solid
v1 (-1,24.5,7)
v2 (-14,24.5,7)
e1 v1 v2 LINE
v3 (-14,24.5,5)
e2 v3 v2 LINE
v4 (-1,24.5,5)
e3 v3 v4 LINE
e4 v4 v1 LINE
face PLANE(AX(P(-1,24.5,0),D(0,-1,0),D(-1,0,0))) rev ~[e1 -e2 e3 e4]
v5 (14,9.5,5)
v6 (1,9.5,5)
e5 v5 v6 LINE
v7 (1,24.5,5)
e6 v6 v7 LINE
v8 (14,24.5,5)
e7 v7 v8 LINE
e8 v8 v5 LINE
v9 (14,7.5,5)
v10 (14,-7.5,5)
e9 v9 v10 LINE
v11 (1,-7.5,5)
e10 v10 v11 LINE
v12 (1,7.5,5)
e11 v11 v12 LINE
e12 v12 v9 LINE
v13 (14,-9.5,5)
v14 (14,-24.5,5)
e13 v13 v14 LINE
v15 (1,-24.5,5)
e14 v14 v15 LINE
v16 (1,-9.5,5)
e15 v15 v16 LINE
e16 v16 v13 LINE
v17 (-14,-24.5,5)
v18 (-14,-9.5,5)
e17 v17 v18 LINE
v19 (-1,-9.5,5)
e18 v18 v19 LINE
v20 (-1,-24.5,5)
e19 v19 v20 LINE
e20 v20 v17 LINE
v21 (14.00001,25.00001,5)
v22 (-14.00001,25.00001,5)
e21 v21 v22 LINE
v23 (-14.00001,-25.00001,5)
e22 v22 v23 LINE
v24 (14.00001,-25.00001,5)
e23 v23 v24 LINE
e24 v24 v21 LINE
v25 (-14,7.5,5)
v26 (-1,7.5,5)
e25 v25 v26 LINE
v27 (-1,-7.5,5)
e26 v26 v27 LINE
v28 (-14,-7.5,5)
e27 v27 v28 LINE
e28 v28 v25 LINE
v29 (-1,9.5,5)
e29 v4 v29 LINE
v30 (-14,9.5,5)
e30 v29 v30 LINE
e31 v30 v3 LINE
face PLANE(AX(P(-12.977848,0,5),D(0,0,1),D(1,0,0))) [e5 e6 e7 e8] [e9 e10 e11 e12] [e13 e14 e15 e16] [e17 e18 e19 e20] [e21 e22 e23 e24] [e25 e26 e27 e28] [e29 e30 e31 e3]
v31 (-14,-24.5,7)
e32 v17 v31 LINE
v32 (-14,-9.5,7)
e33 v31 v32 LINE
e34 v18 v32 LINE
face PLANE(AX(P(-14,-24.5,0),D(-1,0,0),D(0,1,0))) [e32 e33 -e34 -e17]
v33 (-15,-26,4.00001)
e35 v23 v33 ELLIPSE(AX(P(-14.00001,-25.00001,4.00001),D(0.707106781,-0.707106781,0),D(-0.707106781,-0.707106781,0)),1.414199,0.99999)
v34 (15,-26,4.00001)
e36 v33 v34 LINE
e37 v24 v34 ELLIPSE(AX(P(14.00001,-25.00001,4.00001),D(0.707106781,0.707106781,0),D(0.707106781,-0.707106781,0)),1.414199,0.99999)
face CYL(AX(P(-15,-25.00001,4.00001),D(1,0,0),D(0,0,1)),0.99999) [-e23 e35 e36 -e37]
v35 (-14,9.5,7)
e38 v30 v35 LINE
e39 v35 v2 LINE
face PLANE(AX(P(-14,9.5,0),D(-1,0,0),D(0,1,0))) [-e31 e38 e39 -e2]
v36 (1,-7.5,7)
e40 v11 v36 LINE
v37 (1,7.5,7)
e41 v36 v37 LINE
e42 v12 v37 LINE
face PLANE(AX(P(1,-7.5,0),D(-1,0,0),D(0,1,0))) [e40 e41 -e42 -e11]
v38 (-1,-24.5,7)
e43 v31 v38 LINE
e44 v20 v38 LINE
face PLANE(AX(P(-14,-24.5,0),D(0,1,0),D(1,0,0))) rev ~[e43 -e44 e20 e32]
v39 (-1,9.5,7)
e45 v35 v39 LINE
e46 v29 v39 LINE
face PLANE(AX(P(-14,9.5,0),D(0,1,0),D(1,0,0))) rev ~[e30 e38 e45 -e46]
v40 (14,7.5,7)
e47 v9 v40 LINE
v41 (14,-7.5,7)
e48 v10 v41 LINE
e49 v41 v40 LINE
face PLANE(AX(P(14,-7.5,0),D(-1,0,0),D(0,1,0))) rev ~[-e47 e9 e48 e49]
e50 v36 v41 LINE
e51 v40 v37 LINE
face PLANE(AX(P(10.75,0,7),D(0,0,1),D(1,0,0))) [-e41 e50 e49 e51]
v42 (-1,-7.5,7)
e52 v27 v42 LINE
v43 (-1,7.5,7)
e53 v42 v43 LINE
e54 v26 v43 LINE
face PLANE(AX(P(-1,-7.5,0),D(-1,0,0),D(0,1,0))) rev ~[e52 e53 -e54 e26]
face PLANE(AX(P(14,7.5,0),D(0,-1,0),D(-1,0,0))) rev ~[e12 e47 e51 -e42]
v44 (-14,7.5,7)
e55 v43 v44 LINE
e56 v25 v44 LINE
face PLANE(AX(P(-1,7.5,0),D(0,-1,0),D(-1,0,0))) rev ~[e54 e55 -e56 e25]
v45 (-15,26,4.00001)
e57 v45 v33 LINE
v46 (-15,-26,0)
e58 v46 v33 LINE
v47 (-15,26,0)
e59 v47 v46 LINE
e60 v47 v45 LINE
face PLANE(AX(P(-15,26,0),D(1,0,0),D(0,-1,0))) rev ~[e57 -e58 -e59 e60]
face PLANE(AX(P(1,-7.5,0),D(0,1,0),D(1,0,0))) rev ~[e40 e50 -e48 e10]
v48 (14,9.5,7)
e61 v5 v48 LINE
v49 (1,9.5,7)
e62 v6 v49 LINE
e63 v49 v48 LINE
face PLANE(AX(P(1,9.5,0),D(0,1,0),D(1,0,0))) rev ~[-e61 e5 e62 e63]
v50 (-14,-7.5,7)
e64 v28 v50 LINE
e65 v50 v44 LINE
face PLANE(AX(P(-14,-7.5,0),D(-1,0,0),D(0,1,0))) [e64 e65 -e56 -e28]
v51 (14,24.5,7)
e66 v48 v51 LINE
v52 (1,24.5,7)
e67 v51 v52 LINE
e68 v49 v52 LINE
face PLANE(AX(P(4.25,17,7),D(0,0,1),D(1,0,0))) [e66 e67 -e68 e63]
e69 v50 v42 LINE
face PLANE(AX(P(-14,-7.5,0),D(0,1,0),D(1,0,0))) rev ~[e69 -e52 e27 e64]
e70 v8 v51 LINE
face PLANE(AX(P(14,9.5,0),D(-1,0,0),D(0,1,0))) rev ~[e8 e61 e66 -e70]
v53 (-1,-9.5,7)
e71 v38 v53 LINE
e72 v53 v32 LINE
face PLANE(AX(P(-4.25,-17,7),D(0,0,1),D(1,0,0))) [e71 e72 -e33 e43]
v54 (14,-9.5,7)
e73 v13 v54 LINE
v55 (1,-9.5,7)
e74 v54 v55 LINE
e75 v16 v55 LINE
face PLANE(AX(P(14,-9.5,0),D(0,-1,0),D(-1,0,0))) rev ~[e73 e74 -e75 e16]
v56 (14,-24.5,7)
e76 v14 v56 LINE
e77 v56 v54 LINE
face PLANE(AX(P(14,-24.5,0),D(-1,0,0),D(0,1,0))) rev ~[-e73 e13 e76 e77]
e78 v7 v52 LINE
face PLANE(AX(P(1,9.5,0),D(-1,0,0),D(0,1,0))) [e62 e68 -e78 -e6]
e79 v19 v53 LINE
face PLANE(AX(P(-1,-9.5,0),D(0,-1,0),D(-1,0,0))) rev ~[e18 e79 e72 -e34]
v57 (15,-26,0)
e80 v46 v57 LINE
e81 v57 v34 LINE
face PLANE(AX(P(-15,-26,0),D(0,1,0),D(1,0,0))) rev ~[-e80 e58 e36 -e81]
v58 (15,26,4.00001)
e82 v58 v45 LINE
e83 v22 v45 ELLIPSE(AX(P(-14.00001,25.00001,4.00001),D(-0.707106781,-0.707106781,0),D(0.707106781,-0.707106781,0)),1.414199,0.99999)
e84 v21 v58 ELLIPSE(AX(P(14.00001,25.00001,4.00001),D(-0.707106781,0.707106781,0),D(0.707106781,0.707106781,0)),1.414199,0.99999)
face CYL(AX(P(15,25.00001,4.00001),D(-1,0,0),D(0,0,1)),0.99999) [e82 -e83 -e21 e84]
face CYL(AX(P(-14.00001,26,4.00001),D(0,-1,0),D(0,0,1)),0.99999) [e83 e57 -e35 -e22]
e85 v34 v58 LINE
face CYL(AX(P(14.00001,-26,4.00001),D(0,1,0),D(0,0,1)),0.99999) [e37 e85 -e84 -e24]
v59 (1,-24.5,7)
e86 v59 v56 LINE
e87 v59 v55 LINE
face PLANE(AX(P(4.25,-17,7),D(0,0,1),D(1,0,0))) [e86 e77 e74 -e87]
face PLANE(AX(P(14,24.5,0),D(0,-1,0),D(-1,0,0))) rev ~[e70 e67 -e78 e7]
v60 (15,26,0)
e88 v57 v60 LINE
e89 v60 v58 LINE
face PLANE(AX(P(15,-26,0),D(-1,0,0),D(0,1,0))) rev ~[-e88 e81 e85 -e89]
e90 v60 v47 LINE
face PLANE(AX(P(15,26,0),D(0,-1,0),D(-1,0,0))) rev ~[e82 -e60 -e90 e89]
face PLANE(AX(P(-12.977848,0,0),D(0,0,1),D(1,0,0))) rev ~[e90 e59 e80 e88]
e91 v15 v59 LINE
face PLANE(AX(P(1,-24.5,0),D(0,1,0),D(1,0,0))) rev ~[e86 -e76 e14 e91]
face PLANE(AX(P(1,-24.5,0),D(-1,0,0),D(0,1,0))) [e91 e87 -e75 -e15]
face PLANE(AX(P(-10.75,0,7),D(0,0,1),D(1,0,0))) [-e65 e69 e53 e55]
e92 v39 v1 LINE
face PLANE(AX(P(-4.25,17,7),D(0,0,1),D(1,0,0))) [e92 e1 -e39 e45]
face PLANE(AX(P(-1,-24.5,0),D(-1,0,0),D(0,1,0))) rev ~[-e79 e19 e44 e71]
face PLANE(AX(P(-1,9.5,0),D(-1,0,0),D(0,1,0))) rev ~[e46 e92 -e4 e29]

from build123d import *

# Parameters (mm, degrees)
F0_W     = 6.5
F0_H     = 15
F1_DEPTH = 7
F2_DEPTH = 5
F4_R     = 0.99999


# Not quite as in the source:
# - a fillet or chamfer is up to 0.001 mm smaller than in the source, because OpenCascade refuses the exact size
# - a feature names something its author has since deleted; it is built from what else it names


with BuildPart() as f1:
    # F0 (on Top) → F1 (new body)
    with BuildSketch(Plane.XY):
        with Locations((-4.25, 17)):
            Rectangle(F0_W, F0_H)
        with Locations((-10.75, 17)):
            Rectangle(F0_W, F0_H)
    extrude(amount=F1_DEPTH)


with BuildPart() as f1b:
    # F0 (on Top) → F1, piece 2 (new body)
    with BuildSketch(Plane.XY):
        with Locations((-10.75, 0)):
            Rectangle(F0_W, F0_H)
        with Locations((-4.25, 0)):
            Rectangle(F0_W, F0_H)
    extrude(amount=F1_DEPTH)


with BuildPart() as f1c:
    # F0 (on Top) → F1, piece 3 (new body)
    with BuildSketch(Plane.XY):
        with Locations((-4.25, -17)):
            Rectangle(F0_W, F0_H)
        with Locations((-10.75, -17)):
            Rectangle(F0_W, F0_H)
    extrude(amount=F1_DEPTH)


with BuildPart() as f1d:
    # F0 (on Top) → F1, piece 4 (new body)
    with BuildSketch(Plane.XY):
        with Locations((4.25, -17)):
            Rectangle(F0_W, F0_H)
        with Locations((10.75, -17)):
            Rectangle(F0_W, F0_H)
    extrude(amount=F1_DEPTH)


with BuildPart() as f1e:
    # F0 (on Top) → F1, piece 5 (new body)
    with BuildSketch(Plane.XY):
        with Locations((10.75, 0)):
            Rectangle(F0_W, F0_H)
        with Locations((4.25, 0)):
            Rectangle(F0_W, F0_H)
    extrude(amount=F1_DEPTH)


with BuildPart() as f1f:
    # F0 (on Top) → F1, piece 6 (new body)
    with BuildSketch(Plane.XY):
        with Locations((4.25, 17)):
            Rectangle(F0_W, F0_H)
        with Locations((10.75, 17)):
            Rectangle(F0_W, F0_H)
    extrude(amount=F1_DEPTH)


with BuildPart() as f2:
    # F0 (on Top) → F2 (new body)
    with BuildSketch(Plane.XY):
        Polygon((-7.5, 24.5), (-7.5, 26), (-15, 26), (-15, -26), (-7.5, -26), (-7.5, -24.5), (-14, -24.5), (-14, -9.5), (-7.5, -9.5), (-7.5, -7.5), (-14, -7.5), (-14, 7.5), (-7.5, 7.5), (-7.5, 9.5), (-14, 9.5), (-14, 24.5), align=None)
        Polygon((7.5, 24.5), (7.5, 26), (-7.5, 26), (-7.5, 24.5), (-1, 24.5), (-1, 9.5), (-7.5, 9.5), (-7.5, 7.5), (-1, 7.5), (-1, -7.5), (-7.5, -7.5), (-7.5, -9.5), (-1, -9.5), (-1, -24.5), (-7.5, -24.5), (-7.5, -26), (7.5, -26), (7.5, -24.5), (1, -24.5), (1, -9.5), (7.5, -9.5), (7.5, -7.5), (1, -7.5), (1, 7.5), (7.5, 7.5), (7.5, 9.5), (1, 9.5), (1, 24.5), align=None)
        Polygon((15, -26), (15, 26), (7.5, 26), (7.5, 24.5), (14, 24.5), (14, 9.5), (7.5, 9.5), (7.5, 7.5), (14, 7.5), (14, -7.5), (7.5, -7.5), (7.5, -9.5), (14, -9.5), (14, -24.5), (7.5, -24.5), (7.5, -26), align=None)
    extrude(amount=F2_DEPTH)


with BuildPart() as f1f_1:
    add(f1f.part)

    # F3: union F1b, F1c, F2, F1, F1d, F1e
    add(f1b.part)
    add(f1c.part)
    add(f2.part)
    add(f1.part)
    add(f1d.part)
    add(f1e.part)

    # F4 (radius 1 in the source; OpenCascade refuses exactly that, so slightly less here)
    f4_edges = [f1f_1.edges().sort_by_distance(p)[0] for p in [
        (-15, 0, 5),
        (0, -26, 5),
        (15, 0, 5),
        (0, 26, 5),
    ]]
    fillet(f4_edges, radius=F4_R)


solid = f1f_1.part
